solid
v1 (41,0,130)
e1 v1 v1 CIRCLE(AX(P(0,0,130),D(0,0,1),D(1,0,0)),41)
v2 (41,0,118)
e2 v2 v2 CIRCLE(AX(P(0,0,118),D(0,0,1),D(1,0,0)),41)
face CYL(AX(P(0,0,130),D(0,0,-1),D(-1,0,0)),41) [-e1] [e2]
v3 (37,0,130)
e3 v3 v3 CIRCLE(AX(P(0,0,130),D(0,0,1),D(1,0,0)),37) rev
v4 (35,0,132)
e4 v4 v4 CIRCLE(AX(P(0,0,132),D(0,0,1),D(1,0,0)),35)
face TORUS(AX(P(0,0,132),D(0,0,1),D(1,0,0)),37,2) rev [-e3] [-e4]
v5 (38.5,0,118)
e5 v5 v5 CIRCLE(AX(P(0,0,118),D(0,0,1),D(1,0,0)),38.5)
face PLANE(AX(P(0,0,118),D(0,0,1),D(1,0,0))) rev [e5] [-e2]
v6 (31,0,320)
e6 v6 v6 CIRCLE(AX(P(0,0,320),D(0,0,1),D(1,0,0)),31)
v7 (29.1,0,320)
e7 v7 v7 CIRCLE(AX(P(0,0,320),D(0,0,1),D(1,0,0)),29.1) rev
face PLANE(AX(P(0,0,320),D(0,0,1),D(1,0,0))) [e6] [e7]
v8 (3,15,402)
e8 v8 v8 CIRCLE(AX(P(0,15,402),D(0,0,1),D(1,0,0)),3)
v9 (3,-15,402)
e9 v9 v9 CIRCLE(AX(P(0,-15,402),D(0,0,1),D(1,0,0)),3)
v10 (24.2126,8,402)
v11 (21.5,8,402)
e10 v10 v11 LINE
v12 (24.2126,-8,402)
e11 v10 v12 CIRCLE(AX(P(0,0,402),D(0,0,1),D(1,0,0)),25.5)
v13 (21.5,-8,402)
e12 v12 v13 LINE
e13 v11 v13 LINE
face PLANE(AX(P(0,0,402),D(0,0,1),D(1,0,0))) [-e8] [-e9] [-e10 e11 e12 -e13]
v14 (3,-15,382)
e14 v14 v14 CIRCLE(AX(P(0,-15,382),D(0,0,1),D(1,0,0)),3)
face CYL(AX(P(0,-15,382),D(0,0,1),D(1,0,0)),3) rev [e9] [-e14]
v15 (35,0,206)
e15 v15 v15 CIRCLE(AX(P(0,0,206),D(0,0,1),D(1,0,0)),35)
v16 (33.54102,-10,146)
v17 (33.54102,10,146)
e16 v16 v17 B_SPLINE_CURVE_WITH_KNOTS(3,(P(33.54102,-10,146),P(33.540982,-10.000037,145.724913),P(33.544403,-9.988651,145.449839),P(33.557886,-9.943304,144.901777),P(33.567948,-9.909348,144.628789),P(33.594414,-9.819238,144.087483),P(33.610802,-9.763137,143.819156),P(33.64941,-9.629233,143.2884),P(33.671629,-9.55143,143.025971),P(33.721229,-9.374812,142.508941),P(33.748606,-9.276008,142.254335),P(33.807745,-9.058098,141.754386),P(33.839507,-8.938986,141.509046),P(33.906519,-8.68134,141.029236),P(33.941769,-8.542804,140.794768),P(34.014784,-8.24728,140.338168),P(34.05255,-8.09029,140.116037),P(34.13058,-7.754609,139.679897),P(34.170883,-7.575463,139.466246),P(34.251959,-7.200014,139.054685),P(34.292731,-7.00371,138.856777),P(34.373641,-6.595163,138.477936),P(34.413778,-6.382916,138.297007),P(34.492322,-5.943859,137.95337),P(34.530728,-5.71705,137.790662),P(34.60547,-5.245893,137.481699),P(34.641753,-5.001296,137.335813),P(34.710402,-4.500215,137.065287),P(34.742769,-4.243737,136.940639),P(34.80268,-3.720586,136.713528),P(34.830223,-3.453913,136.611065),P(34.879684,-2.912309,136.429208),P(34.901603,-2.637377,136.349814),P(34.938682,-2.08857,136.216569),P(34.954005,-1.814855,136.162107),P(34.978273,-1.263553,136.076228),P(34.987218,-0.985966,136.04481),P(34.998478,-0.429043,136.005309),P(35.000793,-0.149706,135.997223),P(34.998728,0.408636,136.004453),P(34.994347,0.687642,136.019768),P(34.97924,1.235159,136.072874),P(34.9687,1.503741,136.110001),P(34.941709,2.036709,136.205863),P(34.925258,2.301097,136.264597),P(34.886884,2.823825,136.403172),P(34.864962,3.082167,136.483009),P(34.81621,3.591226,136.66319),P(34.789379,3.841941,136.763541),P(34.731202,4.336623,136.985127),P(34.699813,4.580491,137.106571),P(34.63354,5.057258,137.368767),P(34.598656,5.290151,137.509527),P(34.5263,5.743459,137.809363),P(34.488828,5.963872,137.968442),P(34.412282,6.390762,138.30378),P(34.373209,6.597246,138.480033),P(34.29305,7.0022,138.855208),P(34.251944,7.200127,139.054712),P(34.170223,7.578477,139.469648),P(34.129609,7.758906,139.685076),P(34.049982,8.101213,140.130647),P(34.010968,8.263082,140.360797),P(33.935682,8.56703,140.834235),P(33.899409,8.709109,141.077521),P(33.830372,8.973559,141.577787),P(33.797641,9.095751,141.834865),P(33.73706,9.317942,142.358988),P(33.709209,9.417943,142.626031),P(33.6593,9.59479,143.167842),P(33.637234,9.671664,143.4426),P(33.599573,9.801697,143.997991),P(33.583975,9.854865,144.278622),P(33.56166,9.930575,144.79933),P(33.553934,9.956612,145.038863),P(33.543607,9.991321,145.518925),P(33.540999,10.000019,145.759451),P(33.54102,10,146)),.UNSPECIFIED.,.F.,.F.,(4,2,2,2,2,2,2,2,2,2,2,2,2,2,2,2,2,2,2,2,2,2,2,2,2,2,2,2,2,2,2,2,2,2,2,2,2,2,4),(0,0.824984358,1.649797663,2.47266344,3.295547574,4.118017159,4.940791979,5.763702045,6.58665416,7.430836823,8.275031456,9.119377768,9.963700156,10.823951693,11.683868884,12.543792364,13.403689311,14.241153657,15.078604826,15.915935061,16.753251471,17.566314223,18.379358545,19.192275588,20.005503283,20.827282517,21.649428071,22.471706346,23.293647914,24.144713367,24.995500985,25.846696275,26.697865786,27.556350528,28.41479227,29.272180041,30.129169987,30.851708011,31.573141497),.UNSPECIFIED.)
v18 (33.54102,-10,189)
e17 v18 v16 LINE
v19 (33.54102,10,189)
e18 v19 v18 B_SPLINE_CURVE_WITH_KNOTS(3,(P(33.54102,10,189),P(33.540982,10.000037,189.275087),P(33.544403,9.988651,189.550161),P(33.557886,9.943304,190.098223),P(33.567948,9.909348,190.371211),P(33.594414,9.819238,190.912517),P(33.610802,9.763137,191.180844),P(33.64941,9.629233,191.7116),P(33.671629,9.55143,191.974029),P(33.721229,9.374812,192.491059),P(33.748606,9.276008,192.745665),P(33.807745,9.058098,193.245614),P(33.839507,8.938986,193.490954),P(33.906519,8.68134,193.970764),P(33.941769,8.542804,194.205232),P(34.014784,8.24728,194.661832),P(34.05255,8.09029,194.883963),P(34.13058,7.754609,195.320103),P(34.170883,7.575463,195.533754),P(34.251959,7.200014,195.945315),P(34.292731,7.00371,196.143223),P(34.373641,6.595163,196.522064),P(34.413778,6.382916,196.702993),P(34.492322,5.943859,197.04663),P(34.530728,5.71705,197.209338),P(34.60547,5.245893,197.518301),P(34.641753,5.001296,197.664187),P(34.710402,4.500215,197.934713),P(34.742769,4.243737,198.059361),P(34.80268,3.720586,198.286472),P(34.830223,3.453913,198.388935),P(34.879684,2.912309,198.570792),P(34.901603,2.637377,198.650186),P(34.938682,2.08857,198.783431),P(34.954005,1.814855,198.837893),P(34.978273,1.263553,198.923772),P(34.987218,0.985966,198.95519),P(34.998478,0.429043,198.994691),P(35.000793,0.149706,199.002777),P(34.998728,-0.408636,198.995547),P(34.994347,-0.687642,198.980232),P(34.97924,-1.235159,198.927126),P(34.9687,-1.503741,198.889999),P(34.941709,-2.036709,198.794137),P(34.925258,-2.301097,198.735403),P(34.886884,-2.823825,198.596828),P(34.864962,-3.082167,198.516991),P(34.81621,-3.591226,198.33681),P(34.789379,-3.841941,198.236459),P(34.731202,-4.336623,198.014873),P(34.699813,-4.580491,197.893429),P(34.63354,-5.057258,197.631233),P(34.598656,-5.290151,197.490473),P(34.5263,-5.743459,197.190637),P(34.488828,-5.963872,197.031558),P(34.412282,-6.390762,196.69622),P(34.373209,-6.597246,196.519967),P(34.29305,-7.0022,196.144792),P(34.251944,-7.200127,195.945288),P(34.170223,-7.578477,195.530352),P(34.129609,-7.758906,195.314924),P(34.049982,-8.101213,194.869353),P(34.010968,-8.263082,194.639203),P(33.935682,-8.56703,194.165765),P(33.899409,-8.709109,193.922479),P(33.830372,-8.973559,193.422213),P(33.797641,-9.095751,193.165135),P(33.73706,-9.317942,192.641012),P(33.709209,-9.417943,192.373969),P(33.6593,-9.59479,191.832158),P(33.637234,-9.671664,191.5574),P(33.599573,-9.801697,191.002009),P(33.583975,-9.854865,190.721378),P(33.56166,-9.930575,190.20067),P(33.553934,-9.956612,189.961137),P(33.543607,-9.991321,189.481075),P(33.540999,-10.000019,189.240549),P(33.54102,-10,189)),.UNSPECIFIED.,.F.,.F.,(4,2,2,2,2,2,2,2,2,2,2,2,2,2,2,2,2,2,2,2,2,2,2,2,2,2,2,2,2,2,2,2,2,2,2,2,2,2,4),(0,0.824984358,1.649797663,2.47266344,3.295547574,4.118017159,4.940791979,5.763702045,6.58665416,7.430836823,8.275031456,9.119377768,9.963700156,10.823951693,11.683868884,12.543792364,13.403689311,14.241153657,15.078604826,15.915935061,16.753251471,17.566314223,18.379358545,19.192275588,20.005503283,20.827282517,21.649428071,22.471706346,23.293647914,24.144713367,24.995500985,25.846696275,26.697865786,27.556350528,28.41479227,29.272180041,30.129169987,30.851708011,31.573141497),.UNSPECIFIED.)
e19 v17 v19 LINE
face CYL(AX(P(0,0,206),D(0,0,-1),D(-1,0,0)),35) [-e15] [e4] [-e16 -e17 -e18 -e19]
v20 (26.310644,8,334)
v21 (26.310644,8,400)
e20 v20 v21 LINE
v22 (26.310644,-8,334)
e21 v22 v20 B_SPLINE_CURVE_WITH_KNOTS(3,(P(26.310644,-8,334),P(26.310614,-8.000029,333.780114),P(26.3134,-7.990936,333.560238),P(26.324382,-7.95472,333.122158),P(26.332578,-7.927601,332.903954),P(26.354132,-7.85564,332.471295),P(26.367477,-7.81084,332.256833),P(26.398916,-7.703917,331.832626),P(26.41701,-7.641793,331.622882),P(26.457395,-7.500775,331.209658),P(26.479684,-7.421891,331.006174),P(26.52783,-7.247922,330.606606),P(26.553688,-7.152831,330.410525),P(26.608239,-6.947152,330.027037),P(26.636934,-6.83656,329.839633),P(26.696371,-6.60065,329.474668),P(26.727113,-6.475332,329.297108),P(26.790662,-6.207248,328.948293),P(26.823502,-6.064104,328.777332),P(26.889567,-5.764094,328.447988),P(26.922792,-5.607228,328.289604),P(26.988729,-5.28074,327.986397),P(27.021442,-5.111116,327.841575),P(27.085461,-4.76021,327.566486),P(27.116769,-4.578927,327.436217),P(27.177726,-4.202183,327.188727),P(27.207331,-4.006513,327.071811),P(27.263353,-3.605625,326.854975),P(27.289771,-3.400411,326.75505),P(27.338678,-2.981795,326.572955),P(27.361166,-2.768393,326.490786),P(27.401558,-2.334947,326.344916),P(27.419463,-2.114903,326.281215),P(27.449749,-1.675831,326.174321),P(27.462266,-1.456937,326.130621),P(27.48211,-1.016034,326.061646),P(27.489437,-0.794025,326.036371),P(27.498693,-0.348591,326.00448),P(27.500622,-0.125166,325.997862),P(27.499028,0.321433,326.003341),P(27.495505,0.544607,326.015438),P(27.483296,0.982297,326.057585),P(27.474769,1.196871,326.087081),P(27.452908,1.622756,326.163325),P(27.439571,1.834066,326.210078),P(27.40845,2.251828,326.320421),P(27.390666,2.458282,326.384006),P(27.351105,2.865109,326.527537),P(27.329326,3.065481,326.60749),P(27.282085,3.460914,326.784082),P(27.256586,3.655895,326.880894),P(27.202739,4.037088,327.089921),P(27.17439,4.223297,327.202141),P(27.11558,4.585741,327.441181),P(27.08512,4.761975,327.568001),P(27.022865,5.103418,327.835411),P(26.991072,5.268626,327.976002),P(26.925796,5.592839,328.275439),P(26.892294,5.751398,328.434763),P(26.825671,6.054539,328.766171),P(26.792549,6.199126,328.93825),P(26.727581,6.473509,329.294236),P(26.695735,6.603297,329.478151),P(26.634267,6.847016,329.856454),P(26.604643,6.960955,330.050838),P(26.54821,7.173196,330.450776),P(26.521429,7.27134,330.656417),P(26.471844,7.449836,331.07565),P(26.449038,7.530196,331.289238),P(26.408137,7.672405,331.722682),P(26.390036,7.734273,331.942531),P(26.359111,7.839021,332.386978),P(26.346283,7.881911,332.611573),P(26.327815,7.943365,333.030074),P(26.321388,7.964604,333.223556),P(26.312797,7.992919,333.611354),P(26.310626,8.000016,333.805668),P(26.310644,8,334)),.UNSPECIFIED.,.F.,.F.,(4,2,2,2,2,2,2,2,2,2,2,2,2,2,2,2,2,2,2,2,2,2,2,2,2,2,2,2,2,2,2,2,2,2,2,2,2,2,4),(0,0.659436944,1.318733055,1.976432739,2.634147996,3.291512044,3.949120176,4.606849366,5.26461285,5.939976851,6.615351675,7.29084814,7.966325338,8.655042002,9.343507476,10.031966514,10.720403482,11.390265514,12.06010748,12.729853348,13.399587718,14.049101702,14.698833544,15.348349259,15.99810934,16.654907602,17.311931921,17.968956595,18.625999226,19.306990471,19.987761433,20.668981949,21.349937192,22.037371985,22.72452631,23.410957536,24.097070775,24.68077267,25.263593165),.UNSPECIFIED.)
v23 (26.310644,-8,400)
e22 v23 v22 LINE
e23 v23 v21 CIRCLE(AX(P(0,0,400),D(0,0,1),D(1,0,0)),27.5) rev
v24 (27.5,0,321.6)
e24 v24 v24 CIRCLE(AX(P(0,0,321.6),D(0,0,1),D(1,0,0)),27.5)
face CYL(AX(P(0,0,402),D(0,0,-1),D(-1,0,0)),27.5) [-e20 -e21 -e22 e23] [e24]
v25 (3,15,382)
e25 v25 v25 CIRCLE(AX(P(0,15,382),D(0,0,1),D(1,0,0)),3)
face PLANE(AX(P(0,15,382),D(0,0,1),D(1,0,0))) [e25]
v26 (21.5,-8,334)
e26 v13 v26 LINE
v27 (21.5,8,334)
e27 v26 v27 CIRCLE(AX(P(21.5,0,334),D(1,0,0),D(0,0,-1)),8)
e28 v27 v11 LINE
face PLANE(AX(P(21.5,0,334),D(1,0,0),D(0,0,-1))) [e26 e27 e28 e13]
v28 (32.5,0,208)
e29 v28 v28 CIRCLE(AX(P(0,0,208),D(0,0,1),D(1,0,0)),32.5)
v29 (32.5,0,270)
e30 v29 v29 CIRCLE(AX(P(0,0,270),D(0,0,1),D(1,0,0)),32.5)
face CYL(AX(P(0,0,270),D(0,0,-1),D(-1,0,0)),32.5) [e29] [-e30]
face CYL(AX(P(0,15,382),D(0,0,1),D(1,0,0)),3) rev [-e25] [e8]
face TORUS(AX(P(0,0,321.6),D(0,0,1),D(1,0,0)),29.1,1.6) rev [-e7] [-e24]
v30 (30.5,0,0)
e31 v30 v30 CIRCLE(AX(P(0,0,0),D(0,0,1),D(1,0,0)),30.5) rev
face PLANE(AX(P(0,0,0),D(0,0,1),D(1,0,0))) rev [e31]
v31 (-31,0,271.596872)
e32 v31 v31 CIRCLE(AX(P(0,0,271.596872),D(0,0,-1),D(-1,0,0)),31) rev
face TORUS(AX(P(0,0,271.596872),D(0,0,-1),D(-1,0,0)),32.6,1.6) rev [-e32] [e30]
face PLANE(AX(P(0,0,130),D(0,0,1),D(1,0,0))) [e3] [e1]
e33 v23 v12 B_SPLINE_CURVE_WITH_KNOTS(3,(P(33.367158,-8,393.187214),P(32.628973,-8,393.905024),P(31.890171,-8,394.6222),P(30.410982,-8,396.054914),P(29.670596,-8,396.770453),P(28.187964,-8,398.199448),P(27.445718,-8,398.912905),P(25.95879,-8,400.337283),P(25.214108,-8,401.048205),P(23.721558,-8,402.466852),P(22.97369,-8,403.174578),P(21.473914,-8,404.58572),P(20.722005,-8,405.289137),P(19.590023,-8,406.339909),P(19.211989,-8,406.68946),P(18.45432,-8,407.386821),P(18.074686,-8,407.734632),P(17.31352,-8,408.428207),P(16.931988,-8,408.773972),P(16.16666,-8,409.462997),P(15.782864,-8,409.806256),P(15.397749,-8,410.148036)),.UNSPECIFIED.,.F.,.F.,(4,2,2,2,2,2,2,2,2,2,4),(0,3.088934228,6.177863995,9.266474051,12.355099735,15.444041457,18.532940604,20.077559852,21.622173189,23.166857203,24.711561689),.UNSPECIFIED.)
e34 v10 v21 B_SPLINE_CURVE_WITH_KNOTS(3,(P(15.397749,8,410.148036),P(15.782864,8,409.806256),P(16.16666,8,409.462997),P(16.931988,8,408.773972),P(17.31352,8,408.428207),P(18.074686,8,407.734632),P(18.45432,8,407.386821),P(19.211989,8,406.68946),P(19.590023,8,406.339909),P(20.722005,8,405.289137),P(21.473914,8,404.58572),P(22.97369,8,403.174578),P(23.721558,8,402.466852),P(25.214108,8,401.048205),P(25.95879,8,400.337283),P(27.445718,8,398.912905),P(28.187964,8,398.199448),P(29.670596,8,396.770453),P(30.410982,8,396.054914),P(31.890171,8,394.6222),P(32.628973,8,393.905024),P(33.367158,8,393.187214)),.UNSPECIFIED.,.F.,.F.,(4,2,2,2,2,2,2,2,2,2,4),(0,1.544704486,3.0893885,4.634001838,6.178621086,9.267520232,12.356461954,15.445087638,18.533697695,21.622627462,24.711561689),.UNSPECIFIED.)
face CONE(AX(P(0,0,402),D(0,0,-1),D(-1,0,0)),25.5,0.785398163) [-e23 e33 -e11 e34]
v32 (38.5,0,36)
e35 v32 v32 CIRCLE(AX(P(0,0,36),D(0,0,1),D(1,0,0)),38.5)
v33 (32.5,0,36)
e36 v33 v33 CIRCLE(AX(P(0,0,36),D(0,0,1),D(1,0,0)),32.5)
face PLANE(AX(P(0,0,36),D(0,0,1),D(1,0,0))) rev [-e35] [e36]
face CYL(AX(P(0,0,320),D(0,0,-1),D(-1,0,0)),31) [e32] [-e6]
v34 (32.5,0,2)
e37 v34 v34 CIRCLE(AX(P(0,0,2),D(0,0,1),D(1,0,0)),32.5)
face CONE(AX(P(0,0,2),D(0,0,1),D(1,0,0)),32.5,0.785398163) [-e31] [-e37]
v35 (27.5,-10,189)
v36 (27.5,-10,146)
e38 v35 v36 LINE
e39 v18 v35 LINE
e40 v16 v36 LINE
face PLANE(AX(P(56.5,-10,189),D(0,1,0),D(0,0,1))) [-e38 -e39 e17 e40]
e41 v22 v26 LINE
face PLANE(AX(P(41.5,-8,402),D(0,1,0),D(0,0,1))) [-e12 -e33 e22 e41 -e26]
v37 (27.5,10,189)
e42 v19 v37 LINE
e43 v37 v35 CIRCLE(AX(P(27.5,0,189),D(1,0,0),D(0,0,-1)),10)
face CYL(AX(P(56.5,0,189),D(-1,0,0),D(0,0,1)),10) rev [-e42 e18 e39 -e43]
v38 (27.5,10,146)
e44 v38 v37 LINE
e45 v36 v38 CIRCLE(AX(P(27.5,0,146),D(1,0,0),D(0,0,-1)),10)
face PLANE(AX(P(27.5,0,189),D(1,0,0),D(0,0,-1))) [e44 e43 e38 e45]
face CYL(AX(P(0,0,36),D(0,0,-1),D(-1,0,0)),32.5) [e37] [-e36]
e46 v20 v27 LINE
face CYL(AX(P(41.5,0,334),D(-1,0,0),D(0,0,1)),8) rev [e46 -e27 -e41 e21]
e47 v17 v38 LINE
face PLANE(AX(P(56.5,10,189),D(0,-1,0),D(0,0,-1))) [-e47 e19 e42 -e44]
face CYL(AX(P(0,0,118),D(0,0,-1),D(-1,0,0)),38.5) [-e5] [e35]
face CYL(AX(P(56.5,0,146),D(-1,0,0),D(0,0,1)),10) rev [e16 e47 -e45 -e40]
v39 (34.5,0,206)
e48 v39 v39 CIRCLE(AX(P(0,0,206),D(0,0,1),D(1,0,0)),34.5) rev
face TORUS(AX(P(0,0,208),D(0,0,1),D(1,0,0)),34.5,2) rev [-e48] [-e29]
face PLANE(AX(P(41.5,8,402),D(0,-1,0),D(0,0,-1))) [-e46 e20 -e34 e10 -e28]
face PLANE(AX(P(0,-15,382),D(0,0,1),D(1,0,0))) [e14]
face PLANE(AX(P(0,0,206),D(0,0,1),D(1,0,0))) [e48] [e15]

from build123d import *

# Parameters (mm, degrees)
SKETCH_1_R          = 32.5
EXTRUDE_1_DEPTH     = 36
SKETCH_2_R          = 38.5
EXTRUDE_2_DEPTH     = 82
SKETCH_3_R          = 41
EXTRUDE_3_DEPTH     = 12
SKETCH_4_R          = 35
EXTRUDE_4_DEPTH     = 76
SKETCH_5_R          = 32.5
EXTRUDE_5_DEPTH     = 64
SKETCH_6_R          = 31
EXTRUDE_6_DEPTH     = 50
SKETCH_7_R          = 27.5
EXTRUDE_7_DEPTH     = 82
FILLET_1_R          = 2
FILLET_2_R          = 1.6
CHAMFER_1_SIZE      = 2
CUT_EXTRUDE_1_DEPTH = 29
CUT_EXTRUDE_2_DEPTH = 20
SKETCH_10_R         = 3
CUT_EXTRUDE_3_DEPTH = 20


with BuildPart() as part:
    # 草图1 → 凸台-拉伸1 (new body)
    with BuildSketch(Plane.XY):
        Circle(SKETCH_1_R)
    extrude(amount=EXTRUDE_1_DEPTH)

    # 草图2 → 凸台-拉伸2 (add)
    with BuildSketch(Plane.XY.offset(36)):
        Circle(SKETCH_2_R)
    extrude(amount=EXTRUDE_2_DEPTH)

    # 草图3 → 凸台-拉伸3 (add)
    with BuildSketch(Plane.XY.offset(118)):
        Circle(SKETCH_3_R)
    extrude(amount=EXTRUDE_3_DEPTH)

    # 草图4 → 凸台-拉伸4 (add)
    with BuildSketch(Plane.XY.offset(130)):
        Circle(SKETCH_4_R)
    extrude(amount=EXTRUDE_4_DEPTH)

    # 草图5 → 凸台-拉伸5 (add)
    with BuildSketch(Plane.XY.offset(206)):
        Circle(SKETCH_5_R)
    extrude(amount=EXTRUDE_5_DEPTH)

    # 草图6 → 凸台-拉伸6 (add)
    with BuildSketch(Plane.XY.offset(270)):
        Circle(SKETCH_6_R)
    extrude(amount=EXTRUDE_6_DEPTH)

    # 草图7 → 凸台-拉伸7 (add)
    with BuildSketch(Plane.XY.offset(320)):
        Circle(SKETCH_7_R)
    extrude(amount=EXTRUDE_7_DEPTH)

    # 圆角1
    fillet_1_edges = [part.edges().sort_by_distance(p)[0] for p in [
        (-35, 0, 130),
        (-32.5, 0, 206),
    ]]
    fillet(fillet_1_edges, radius=FILLET_1_R)

    # 圆角2
    # the kernel refuses this fillet: 1.6 mm, written as the material it adds along each edge
    with BuildSketch(Plane(origin=(0, 0, 270), x_dir=(1, 0, 0), z_dir=(0, -1, 0))) as fillet_2_piece_1:
        with BuildLine():
            CenterArc((32.6, 1.596871942), FILLET_2_R, 180, 86.416678302)
            Line((31, 1.596871942), (30.968, 1.596871942))
            Line((30.968, 1.596871942), (30.968, 0))
            Line((30.968, 0), (31, -0.032))
            ThreePointArc((31, -0.032), (31.75, -0.032), (32.498, -0.031937439))
            Line((32.498, -0.031937439), (32.5, 0))
        make_face()
    revolve(axis=Axis((0, 0, 270), (0, 0, 1)))
    with BuildSketch(Plane(origin=(0, 0, 320), x_dir=(1, 0, 0), z_dir=(0, -1, 0))) as fillet_2_piece_2:
        with BuildLine():
            CenterArc((27.5 + FILLET_2_R, FILLET_2_R), FILLET_2_R, 180, 90)
            Line((27.5, FILLET_2_R), (27.5 - FILLET_2_R * 0.02, FILLET_2_R))
            Line((27.5 - FILLET_2_R * 0.02, FILLET_2_R), (27.5 - FILLET_2_R * 0.02, -FILLET_2_R * 0.02))
            Line((27.5 - FILLET_2_R * 0.02, -FILLET_2_R * 0.02), (27.5 + FILLET_2_R, -FILLET_2_R * 0.02))
            Line((27.5 + FILLET_2_R, -FILLET_2_R * 0.02), (27.5 + FILLET_2_R, 0))
        make_face()
    revolve(axis=Axis((0, 0, 320), (0, 0, 1)))

    # 倒角1
    chamfer_1_edges = [part.edges().sort_by_distance(p)[0] for p in [
        (-32.5, 0, 0),
        (-27.5, 0, 402),
    ]]
    chamfer(chamfer_1_edges, length=CHAMFER_1_SIZE)

    # 草图8 → 切除-拉伸1 (cut)
    with BuildSketch(Plane(origin=(27.5, 0, 0), x_dir=(0, 0, -1), z_dir=(1, 0, 0))):
        with BuildLine():
            Line((-189, 10), (-146, 10))
            ThreePointArc((-146, 10), (-136, 0), (-146, -10))
            Line((-146, -10), (-189, -10))
            ThreePointArc((-189, -10), (-199, 0), (-189, 10))
        make_face()
    extrude(amount=CUT_EXTRUDE_1_DEPTH, mode=Mode.SUBTRACT)

    # 草图9 → 切除-拉伸2 (cut)
    with BuildSketch(Plane(origin=(21.5, 0, 0), x_dir=(0, 0, -1), z_dir=(1, 0, 0))):
        with BuildLine():
            Line((-402, 8), (-334, 8))
            ThreePointArc((-334, 8), (-326, 0), (-334, -8))
            Line((-334, -8), (-402, -8))
            Line((-402, -8), (-402, 8))
        make_face()
    extrude(amount=CUT_EXTRUDE_2_DEPTH, mode=Mode.SUBTRACT)

    # 草图10 → 切除-拉伸3 (cut)
    with BuildSketch(Plane.XY.offset(402)):
        with Locations((0, 15)):
            Circle(SKETCH_10_R)
        with Locations((0, -15)):
            Circle(SKETCH_10_R)
    extrude(amount=-CUT_EXTRUDE_3_DEPTH, mode=Mode.SUBTRACT)


solid = part.part
